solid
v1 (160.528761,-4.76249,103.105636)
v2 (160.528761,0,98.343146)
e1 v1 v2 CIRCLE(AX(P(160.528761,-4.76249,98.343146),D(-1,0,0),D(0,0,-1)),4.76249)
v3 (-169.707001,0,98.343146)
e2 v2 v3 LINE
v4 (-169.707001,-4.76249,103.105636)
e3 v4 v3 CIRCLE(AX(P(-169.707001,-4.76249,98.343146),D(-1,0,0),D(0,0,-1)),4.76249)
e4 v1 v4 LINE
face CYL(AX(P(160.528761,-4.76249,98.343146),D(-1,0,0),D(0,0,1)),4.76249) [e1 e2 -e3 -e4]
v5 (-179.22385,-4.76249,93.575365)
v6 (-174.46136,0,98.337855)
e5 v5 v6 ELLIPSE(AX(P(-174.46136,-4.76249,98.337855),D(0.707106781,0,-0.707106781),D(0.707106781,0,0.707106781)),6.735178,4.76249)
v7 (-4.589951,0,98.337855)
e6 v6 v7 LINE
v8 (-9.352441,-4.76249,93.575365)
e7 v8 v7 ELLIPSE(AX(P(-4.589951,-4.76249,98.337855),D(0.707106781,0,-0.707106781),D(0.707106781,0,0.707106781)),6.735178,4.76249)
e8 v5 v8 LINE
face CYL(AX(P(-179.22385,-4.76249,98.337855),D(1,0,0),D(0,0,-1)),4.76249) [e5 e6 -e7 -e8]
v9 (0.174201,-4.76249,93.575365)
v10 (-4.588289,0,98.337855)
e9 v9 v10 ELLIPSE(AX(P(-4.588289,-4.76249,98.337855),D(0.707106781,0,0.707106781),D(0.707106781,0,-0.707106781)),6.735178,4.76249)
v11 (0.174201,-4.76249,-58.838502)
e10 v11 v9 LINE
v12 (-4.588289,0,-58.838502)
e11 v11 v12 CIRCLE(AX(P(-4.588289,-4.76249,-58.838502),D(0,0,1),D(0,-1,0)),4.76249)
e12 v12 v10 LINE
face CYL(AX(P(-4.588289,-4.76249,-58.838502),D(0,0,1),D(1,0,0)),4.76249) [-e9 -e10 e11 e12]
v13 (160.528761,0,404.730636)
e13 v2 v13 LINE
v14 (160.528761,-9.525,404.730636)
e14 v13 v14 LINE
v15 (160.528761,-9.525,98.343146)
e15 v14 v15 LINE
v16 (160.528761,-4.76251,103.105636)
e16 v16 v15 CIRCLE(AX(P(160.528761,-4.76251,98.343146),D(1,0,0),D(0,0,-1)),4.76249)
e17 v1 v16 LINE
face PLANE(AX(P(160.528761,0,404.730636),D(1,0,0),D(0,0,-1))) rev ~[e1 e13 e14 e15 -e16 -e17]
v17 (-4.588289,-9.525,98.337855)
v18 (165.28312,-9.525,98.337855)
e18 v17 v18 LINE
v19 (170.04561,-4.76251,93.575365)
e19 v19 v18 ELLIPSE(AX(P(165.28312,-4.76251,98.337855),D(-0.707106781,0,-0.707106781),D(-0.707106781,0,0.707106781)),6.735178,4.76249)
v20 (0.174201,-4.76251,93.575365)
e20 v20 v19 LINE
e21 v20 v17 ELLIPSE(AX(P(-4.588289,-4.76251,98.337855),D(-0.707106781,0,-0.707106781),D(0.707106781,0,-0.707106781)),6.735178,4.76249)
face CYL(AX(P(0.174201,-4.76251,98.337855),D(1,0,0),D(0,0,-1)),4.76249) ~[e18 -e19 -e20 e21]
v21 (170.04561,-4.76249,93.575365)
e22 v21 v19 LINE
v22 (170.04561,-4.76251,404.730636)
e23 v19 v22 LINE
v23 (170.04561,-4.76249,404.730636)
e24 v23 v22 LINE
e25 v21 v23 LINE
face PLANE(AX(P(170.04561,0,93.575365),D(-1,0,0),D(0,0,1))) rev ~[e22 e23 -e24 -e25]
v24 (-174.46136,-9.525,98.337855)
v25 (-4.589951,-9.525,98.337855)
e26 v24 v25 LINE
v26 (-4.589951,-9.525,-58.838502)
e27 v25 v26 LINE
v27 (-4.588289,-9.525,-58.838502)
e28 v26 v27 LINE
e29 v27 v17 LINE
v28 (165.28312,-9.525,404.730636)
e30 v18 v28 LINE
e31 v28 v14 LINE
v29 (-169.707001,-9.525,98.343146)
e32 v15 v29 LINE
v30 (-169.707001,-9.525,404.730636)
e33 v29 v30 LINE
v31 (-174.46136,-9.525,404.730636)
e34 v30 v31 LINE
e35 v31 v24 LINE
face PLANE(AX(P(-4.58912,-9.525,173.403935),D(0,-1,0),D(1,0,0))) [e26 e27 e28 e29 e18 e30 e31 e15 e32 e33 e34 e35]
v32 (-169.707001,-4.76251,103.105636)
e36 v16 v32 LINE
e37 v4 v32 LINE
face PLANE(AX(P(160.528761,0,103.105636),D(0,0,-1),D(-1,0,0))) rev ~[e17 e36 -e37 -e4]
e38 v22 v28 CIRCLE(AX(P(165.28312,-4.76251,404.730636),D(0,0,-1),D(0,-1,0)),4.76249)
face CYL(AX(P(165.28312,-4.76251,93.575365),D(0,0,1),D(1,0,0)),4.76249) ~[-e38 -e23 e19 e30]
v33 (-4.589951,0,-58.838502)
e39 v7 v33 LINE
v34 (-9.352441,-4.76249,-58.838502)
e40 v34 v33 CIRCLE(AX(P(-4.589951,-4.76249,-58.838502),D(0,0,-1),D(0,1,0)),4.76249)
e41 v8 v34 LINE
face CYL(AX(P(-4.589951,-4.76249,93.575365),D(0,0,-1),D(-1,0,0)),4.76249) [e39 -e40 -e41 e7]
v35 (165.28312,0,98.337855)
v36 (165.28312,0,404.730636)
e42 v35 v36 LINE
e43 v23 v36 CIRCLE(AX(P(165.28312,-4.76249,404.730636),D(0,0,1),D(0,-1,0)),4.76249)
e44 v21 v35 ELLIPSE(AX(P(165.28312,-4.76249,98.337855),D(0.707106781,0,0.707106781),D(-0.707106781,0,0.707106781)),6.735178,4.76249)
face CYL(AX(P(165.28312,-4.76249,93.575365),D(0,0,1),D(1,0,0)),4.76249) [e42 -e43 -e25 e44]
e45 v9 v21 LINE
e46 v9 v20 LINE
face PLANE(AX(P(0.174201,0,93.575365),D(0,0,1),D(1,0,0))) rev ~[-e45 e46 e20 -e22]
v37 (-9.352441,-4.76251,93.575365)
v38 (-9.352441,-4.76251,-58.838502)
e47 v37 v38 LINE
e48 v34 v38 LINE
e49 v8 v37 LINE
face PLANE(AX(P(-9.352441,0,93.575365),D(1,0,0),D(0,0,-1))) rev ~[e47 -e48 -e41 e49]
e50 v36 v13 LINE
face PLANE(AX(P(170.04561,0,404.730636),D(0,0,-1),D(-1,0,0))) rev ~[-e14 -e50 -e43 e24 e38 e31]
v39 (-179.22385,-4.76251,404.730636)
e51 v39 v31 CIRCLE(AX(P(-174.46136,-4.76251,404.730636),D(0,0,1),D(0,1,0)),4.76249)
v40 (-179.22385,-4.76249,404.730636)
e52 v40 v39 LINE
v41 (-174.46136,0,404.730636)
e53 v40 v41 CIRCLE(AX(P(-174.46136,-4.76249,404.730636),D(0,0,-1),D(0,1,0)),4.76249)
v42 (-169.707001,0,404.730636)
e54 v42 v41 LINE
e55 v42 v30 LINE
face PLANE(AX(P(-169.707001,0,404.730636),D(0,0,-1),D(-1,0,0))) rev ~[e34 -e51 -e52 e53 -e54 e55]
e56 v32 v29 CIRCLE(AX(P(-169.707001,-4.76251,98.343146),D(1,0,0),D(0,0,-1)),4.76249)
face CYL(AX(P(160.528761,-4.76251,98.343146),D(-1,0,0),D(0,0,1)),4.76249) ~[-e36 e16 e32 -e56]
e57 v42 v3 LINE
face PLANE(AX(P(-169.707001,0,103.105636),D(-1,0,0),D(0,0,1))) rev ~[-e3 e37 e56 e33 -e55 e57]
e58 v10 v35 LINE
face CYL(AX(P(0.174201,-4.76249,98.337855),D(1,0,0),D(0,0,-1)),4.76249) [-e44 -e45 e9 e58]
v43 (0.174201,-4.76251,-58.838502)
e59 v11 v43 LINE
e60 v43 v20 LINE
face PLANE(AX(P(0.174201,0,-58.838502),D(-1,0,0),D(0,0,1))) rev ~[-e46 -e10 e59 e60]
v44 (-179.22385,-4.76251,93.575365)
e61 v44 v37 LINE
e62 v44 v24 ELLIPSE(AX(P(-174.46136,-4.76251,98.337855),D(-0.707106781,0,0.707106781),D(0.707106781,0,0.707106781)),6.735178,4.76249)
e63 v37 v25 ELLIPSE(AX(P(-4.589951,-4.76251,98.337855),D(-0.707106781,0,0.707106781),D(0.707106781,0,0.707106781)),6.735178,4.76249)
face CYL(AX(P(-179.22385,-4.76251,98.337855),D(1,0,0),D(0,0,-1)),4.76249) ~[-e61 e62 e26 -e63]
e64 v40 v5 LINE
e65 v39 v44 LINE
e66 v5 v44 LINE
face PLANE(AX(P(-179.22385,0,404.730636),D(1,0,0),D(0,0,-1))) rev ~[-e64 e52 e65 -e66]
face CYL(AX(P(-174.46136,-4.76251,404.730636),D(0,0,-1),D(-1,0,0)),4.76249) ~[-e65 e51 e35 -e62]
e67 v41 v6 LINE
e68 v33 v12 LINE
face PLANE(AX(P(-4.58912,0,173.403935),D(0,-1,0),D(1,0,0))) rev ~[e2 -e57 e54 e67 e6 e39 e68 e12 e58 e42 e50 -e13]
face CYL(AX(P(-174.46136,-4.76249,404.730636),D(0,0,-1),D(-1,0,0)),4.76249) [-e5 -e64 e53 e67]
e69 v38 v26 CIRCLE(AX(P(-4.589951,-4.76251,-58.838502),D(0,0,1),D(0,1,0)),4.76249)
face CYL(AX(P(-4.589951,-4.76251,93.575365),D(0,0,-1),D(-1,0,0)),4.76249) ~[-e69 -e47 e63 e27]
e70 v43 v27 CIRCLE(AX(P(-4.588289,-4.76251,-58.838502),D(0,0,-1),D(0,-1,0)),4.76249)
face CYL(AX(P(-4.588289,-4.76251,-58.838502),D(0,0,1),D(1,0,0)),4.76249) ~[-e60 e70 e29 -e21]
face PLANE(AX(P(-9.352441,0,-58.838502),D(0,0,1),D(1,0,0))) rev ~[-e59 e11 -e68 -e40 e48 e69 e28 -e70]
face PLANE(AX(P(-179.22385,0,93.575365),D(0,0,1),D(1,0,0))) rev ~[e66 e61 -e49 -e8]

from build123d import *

# Parameters (mm, degrees)
F1_DEPTH = 9.525
F2_R     = 4.76249


# Not quite as in the source:
# - a fillet or chamfer is up to 0.001 mm smaller than in the source, because OpenCascade refuses the exact size


with BuildPart() as f1:
    # F0 (on Front) → F1 (new body)
    with BuildSketch(Plane.XZ):
        Polygon((-9.3524411189, 93.575365177), (-9.3524411189, -58.8385015355), (-4.5891202249, -58.8385015355), (0.174200669, -58.8385015355), (0.174200669, 93.575365177), (170.0456099196, 93.575365177), (170.0456099196, 404.7306356684), (160.5287608864, 404.7306356684), (160.5287608864, 103.1056356684), (-4.5891202249, 103.1056356684), (-169.7070013363, 103.1056356684), (-169.7070013363, 404.7306356684), (-179.2238503695, 404.7306356684), (-179.2238503695, 93.575365177), align=None)
    extrude(amount=F1_DEPTH)

    # F2 (radius 4.7625 in the source; OpenCascade refuses exactly that, so slightly less here)
    f2_edges = [f1.edges().sort_by_distance(p)[0] for p in [
        (170.04561, -9.525, 249.153),
        (170.04561, 0, 249.153),
        (-4.58912, 0, 103.105636),
        (-4.58912, -9.525, 103.105636),
        (-94.288146, -9.525, 93.575365),
        (-94.288146, 0, 93.575365),
        (85.109905, -9.525, 93.575365),
        (85.109905, 0, 93.575365),
        (0.174201, -9.525, 17.368432),
        (-9.352441, -9.525, 17.368432),
        (-9.352441, 0, 17.368432),
        (0.174201, 0, 17.368432),
        (-179.22385, 0, 249.153),
        (-179.22385, -9.525, 249.153),
    ]]
    fillet(f2_edges, radius=F2_R)


solid = f1.part
